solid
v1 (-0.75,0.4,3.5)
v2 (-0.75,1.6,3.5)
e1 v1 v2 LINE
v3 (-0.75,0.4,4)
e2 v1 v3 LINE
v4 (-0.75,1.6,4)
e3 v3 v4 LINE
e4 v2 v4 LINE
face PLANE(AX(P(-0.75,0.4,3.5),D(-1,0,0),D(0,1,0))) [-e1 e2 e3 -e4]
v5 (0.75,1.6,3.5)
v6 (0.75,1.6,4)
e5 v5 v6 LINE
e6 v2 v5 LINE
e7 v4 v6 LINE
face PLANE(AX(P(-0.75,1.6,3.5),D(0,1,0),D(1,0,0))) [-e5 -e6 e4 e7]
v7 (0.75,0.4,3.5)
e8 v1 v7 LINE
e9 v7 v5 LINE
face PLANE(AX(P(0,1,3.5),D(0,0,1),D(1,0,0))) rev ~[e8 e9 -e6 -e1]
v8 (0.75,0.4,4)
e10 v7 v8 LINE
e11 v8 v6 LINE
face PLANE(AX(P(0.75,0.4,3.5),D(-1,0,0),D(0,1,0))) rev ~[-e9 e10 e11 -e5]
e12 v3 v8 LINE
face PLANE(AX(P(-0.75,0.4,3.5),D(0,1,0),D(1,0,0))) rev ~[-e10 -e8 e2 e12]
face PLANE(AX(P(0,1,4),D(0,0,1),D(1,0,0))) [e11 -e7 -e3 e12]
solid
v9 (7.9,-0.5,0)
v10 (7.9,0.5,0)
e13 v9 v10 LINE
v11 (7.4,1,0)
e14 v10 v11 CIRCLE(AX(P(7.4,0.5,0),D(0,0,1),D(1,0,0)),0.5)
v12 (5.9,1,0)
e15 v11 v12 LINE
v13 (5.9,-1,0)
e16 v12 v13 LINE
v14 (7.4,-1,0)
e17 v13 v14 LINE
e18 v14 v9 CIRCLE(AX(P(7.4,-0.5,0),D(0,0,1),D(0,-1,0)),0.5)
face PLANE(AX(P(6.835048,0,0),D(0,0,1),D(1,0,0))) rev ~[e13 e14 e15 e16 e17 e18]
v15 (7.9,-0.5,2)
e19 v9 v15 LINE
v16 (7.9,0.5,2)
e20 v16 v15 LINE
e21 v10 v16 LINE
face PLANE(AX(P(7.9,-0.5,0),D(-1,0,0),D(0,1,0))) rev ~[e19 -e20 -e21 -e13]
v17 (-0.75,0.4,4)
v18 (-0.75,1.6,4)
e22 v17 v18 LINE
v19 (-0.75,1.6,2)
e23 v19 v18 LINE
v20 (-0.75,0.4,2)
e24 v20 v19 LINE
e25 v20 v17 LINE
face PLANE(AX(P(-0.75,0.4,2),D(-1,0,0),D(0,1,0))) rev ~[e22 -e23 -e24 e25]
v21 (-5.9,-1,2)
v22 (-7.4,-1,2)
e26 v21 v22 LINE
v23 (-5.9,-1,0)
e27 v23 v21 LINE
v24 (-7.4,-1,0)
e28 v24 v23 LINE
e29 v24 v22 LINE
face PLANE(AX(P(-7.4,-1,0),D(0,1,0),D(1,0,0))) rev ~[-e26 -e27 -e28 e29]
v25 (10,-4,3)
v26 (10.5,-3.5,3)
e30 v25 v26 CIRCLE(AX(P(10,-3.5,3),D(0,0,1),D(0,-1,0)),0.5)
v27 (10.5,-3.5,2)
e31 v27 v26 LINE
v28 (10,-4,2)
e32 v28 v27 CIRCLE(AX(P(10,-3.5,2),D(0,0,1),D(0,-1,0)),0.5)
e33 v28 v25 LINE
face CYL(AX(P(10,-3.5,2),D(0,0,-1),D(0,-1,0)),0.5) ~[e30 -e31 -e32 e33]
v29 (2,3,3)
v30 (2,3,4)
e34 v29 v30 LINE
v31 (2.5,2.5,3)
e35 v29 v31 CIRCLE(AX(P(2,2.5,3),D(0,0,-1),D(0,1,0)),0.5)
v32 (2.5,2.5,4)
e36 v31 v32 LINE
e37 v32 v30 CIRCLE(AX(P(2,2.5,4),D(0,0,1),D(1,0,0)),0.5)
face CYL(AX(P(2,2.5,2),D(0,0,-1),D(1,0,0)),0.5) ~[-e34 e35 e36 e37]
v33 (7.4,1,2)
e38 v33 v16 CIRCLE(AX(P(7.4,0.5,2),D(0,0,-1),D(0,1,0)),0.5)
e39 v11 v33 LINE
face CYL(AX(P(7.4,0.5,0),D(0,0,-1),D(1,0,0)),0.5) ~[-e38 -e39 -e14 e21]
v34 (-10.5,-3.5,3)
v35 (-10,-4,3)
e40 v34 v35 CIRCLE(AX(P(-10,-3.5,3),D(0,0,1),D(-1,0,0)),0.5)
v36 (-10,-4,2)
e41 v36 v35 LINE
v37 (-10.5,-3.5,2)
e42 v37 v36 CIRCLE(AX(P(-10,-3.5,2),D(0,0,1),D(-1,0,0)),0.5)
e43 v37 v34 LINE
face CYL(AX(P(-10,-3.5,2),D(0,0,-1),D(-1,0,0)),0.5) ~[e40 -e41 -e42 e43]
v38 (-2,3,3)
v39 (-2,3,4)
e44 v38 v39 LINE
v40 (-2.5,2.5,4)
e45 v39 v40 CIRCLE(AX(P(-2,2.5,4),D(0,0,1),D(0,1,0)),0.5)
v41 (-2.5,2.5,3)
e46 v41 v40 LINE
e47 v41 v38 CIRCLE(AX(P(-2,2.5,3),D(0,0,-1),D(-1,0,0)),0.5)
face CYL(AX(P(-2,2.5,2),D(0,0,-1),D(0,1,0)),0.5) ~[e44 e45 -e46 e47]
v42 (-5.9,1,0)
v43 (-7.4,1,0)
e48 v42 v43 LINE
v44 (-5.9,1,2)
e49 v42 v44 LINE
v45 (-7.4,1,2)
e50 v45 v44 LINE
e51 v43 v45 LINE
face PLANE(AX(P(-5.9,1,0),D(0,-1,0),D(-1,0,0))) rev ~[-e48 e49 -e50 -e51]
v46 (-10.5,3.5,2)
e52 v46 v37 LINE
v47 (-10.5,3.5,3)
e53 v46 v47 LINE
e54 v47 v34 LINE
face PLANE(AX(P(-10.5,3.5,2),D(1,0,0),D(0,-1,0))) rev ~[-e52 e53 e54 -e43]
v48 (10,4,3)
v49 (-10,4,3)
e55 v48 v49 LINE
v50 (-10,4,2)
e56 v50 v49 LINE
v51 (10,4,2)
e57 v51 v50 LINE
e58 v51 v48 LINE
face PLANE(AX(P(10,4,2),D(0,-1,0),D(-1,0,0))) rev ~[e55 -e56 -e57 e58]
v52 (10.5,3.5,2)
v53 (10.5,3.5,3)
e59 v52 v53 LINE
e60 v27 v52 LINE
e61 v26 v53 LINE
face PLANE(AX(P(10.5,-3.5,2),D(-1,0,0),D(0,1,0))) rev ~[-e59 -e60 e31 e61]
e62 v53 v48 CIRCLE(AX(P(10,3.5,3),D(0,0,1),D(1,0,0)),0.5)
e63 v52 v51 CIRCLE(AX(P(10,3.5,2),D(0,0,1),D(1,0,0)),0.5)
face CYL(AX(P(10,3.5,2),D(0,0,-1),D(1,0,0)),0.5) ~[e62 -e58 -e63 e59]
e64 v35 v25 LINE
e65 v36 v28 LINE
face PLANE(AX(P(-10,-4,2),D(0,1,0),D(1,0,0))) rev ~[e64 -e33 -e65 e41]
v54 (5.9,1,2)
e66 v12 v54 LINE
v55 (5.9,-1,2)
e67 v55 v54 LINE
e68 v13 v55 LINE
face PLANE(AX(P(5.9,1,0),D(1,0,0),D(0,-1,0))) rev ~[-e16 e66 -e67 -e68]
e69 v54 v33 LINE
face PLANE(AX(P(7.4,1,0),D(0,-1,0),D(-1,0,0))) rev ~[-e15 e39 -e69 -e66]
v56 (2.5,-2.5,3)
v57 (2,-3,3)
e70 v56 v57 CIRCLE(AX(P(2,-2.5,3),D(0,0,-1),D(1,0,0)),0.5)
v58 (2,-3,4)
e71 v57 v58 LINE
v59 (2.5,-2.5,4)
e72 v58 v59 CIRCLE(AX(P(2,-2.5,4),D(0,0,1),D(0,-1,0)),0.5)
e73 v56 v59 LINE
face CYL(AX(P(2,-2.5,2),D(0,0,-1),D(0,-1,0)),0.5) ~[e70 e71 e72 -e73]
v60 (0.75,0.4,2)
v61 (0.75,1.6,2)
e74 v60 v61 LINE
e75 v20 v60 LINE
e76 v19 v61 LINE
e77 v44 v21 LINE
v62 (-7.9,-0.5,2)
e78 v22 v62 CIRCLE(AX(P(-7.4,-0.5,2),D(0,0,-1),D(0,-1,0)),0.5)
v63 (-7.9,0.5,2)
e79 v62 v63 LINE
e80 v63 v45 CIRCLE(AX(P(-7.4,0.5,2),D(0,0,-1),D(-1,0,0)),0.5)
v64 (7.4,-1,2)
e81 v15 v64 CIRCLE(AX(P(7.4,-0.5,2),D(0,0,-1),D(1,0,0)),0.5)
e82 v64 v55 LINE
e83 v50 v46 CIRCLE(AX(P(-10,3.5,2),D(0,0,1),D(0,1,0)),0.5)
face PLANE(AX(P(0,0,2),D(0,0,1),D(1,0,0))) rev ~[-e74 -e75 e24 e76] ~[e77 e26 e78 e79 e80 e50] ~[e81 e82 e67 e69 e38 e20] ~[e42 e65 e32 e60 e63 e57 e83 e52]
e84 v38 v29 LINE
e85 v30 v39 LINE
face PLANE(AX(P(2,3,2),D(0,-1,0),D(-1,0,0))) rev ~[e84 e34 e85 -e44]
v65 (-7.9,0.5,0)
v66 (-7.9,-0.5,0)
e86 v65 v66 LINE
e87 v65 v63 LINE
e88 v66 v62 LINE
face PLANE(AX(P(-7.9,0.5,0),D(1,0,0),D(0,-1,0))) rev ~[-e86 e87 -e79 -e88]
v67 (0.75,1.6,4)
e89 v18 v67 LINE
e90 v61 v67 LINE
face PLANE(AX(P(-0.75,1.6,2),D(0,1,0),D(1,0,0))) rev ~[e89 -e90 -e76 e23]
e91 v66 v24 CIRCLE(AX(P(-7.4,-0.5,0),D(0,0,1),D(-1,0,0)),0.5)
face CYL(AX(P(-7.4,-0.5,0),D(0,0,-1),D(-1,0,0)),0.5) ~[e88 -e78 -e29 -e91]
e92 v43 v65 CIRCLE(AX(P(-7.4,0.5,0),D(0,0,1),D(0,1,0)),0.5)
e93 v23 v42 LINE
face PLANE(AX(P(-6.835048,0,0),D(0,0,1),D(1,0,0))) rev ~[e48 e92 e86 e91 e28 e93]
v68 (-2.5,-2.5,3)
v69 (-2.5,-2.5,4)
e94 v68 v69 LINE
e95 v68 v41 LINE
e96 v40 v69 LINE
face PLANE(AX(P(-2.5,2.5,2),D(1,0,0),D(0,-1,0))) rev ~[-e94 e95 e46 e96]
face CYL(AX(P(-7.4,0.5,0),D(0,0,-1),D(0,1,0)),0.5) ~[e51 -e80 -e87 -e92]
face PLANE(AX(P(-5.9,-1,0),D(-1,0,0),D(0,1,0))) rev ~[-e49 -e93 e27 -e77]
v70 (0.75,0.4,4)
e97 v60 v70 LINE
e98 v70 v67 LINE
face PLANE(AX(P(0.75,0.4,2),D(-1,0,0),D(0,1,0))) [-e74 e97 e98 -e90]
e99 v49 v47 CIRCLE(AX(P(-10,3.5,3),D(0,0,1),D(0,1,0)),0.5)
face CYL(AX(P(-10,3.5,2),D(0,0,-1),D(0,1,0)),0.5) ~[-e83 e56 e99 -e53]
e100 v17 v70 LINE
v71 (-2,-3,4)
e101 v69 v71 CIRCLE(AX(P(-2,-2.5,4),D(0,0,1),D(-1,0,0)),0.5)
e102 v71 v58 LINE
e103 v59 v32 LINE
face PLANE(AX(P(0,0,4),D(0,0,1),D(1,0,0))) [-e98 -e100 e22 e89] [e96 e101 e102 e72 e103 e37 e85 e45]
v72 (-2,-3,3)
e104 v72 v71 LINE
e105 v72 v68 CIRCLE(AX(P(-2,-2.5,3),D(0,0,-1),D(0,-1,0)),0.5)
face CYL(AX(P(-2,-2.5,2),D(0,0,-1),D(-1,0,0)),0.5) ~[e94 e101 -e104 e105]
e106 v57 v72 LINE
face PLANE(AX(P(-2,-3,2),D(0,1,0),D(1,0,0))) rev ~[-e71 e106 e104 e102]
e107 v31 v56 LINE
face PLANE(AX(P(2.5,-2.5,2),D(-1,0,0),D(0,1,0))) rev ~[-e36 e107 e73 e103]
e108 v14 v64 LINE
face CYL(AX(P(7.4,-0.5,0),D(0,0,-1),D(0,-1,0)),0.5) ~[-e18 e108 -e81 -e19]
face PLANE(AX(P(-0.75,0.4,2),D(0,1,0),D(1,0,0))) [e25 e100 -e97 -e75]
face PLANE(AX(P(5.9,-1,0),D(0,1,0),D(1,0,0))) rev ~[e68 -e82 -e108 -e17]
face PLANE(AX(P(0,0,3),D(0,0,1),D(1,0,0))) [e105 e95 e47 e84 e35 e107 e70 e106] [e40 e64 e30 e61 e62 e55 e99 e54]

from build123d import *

# Parameters (mm, degrees)
F1_START = 2
F1_DEPTH = 1
F2_DEPTH = 3
F3_START = 2
F0_W     = 1.5
F0_H     = 1.2
F3_DEPTH = 2
F4_START = 3.5
F4_DEPTH = 0.5


# Not quite as in the source:
# - a feature names something its author has since deleted; it is built from what else it names


with BuildPart() as f1:
    # F0 (on Top) → F1 (new body)
    with BuildSketch(Plane.XY.offset(F1_START)):
        with BuildLine():
            Line((10, 4), (-10, 4))
            ThreePointArc((-10, 4), (-10.3535533906, 3.8535533906), (-10.5, 3.5))
            Line((-10.5, 3.5), (-10.5, -3.5))
            ThreePointArc((-10.5, -3.5), (-10.3535533906, -3.8535533906), (-10, -4))
            Line((-10, -4), (10, -4))
            ThreePointArc((10, -4), (10.3535533906, -3.8535533906), (10.5, -3.5))
            Line((10.5, -3.5), (10.5, 3.5))
            ThreePointArc((10.5, 3.5), (10.3535533906, 3.8535533906), (10, 4))
        make_face()
        with BuildLine():
            ThreePointArc((-7.9, 0.5), (-7.7535533906, 0.8535533906), (-7.4, 1))
            Line((-7.4, 1), (-5.9, 1))
            Line((-5.9, 1), (-5.9, -1))
            Line((-5.9, -1), (-7.4, -1))
            ThreePointArc((-7.4, -1), (-7.7535533906, -0.8535533906), (-7.9, -0.5))
            Line((-7.9, -0.5), (-7.9, 0.5))
        make_face(mode=Mode.SUBTRACT)
        with BuildLine():
            Line((-2, 3), (2, 3))
            ThreePointArc((2, 3), (2.3535533906, 2.8535533906), (2.5, 2.5))
            Line((2.5, 2.5), (2.5, -2.5))
            ThreePointArc((2.5, -2.5), (2.3535533906, -2.8535533906), (2, -3))
            Line((2, -3), (-2, -3))
            ThreePointArc((-2, -3), (-2.3535533906, -2.8535533906), (-2.5, -2.5))
            Line((-2.5, -2.5), (-2.5, 2.5))
            ThreePointArc((-2.5, 2.5), (-2.3535533906, 2.8535533906), (-2, 3))
        make_face(mode=Mode.SUBTRACT)
        with BuildLine():
            Line((5.9, -1), (5.9, 1))
            Line((5.9, 1), (7.4, 1))
            ThreePointArc((7.4, 1), (7.7535533906, 0.8535533906), (7.9, 0.5))
            Line((7.9, 0.5), (7.9, -0.5))
            ThreePointArc((7.9, -0.5), (7.7535533906, -0.8535533906), (7.4, -1))
            Line((7.4, -1), (5.9, -1))
        make_face(mode=Mode.SUBTRACT)
    extrude(amount=F1_DEPTH)

    # F0 (on Top) → F2 (join)
    with BuildSketch(Plane.XY):
        with BuildLine():
            Line((-5.9, 1), (-7.4, 1))
            ThreePointArc((-7.4, 1), (-7.7535533906, 0.8535533906), (-7.9, 0.5))
            Line((-7.9, 0.5), (-7.9, -0.5))
            ThreePointArc((-7.9, -0.5), (-7.7535533906, -0.8535533906), (-7.4, -1))
            Line((-7.4, -1), (-5.9, -1))
            Line((-5.9, -1), (-5.9, 1))
        make_face()
        with BuildLine():
            Line((7.4, 1), (5.9, 1))
            Line((5.9, 1), (5.9, -1))
            Line((5.9, -1), (7.4, -1))
            ThreePointArc((7.4, -1), (7.7535533906, -0.8535533906), (7.9, -0.5))
            Line((7.9, -0.5), (7.9, 0.5))
            ThreePointArc((7.9, 0.5), (7.7535533906, 0.8535533906), (7.4, 1))
        make_face()
    extrude(amount=F2_DEPTH)

    # F0 (on Top) → F3 (join)
    with BuildSketch(Plane.XY.offset(F3_START)):
        with BuildLine():
            ThreePointArc((2.5, 2.5), (2.3535533906, 2.8535533906), (2, 3))
            Line((2, 3), (-2, 3))
            ThreePointArc((-2, 3), (-2.3535533906, 2.8535533906), (-2.5, 2.5))
            Line((-2.5, 2.5), (-2.5, -2.5))
            ThreePointArc((-2.5, -2.5), (-2.3535533906, -2.8535533906), (-2, -3))
            Line((-2, -3), (2, -3))
            ThreePointArc((2, -3), (2.3535533906, -2.8535533906), (2.5, -2.5))
            Line((2.5, -2.5), (2.5, 2.5))
        make_face()
        with Locations((0, 1)):
            Rectangle(F0_W, F0_H, mode=Mode.SUBTRACT)
    extrude(amount=F3_DEPTH)


with BuildPart() as f4:
    # F0 (on Top) → F4 (new body)
    with BuildSketch(Plane.XY.offset(F4_START)):
        with Locations((0, 1)):
            Rectangle(F0_W, F0_H)
    extrude(amount=F4_DEPTH)


solid = Compound([f1.part, f4.part])
